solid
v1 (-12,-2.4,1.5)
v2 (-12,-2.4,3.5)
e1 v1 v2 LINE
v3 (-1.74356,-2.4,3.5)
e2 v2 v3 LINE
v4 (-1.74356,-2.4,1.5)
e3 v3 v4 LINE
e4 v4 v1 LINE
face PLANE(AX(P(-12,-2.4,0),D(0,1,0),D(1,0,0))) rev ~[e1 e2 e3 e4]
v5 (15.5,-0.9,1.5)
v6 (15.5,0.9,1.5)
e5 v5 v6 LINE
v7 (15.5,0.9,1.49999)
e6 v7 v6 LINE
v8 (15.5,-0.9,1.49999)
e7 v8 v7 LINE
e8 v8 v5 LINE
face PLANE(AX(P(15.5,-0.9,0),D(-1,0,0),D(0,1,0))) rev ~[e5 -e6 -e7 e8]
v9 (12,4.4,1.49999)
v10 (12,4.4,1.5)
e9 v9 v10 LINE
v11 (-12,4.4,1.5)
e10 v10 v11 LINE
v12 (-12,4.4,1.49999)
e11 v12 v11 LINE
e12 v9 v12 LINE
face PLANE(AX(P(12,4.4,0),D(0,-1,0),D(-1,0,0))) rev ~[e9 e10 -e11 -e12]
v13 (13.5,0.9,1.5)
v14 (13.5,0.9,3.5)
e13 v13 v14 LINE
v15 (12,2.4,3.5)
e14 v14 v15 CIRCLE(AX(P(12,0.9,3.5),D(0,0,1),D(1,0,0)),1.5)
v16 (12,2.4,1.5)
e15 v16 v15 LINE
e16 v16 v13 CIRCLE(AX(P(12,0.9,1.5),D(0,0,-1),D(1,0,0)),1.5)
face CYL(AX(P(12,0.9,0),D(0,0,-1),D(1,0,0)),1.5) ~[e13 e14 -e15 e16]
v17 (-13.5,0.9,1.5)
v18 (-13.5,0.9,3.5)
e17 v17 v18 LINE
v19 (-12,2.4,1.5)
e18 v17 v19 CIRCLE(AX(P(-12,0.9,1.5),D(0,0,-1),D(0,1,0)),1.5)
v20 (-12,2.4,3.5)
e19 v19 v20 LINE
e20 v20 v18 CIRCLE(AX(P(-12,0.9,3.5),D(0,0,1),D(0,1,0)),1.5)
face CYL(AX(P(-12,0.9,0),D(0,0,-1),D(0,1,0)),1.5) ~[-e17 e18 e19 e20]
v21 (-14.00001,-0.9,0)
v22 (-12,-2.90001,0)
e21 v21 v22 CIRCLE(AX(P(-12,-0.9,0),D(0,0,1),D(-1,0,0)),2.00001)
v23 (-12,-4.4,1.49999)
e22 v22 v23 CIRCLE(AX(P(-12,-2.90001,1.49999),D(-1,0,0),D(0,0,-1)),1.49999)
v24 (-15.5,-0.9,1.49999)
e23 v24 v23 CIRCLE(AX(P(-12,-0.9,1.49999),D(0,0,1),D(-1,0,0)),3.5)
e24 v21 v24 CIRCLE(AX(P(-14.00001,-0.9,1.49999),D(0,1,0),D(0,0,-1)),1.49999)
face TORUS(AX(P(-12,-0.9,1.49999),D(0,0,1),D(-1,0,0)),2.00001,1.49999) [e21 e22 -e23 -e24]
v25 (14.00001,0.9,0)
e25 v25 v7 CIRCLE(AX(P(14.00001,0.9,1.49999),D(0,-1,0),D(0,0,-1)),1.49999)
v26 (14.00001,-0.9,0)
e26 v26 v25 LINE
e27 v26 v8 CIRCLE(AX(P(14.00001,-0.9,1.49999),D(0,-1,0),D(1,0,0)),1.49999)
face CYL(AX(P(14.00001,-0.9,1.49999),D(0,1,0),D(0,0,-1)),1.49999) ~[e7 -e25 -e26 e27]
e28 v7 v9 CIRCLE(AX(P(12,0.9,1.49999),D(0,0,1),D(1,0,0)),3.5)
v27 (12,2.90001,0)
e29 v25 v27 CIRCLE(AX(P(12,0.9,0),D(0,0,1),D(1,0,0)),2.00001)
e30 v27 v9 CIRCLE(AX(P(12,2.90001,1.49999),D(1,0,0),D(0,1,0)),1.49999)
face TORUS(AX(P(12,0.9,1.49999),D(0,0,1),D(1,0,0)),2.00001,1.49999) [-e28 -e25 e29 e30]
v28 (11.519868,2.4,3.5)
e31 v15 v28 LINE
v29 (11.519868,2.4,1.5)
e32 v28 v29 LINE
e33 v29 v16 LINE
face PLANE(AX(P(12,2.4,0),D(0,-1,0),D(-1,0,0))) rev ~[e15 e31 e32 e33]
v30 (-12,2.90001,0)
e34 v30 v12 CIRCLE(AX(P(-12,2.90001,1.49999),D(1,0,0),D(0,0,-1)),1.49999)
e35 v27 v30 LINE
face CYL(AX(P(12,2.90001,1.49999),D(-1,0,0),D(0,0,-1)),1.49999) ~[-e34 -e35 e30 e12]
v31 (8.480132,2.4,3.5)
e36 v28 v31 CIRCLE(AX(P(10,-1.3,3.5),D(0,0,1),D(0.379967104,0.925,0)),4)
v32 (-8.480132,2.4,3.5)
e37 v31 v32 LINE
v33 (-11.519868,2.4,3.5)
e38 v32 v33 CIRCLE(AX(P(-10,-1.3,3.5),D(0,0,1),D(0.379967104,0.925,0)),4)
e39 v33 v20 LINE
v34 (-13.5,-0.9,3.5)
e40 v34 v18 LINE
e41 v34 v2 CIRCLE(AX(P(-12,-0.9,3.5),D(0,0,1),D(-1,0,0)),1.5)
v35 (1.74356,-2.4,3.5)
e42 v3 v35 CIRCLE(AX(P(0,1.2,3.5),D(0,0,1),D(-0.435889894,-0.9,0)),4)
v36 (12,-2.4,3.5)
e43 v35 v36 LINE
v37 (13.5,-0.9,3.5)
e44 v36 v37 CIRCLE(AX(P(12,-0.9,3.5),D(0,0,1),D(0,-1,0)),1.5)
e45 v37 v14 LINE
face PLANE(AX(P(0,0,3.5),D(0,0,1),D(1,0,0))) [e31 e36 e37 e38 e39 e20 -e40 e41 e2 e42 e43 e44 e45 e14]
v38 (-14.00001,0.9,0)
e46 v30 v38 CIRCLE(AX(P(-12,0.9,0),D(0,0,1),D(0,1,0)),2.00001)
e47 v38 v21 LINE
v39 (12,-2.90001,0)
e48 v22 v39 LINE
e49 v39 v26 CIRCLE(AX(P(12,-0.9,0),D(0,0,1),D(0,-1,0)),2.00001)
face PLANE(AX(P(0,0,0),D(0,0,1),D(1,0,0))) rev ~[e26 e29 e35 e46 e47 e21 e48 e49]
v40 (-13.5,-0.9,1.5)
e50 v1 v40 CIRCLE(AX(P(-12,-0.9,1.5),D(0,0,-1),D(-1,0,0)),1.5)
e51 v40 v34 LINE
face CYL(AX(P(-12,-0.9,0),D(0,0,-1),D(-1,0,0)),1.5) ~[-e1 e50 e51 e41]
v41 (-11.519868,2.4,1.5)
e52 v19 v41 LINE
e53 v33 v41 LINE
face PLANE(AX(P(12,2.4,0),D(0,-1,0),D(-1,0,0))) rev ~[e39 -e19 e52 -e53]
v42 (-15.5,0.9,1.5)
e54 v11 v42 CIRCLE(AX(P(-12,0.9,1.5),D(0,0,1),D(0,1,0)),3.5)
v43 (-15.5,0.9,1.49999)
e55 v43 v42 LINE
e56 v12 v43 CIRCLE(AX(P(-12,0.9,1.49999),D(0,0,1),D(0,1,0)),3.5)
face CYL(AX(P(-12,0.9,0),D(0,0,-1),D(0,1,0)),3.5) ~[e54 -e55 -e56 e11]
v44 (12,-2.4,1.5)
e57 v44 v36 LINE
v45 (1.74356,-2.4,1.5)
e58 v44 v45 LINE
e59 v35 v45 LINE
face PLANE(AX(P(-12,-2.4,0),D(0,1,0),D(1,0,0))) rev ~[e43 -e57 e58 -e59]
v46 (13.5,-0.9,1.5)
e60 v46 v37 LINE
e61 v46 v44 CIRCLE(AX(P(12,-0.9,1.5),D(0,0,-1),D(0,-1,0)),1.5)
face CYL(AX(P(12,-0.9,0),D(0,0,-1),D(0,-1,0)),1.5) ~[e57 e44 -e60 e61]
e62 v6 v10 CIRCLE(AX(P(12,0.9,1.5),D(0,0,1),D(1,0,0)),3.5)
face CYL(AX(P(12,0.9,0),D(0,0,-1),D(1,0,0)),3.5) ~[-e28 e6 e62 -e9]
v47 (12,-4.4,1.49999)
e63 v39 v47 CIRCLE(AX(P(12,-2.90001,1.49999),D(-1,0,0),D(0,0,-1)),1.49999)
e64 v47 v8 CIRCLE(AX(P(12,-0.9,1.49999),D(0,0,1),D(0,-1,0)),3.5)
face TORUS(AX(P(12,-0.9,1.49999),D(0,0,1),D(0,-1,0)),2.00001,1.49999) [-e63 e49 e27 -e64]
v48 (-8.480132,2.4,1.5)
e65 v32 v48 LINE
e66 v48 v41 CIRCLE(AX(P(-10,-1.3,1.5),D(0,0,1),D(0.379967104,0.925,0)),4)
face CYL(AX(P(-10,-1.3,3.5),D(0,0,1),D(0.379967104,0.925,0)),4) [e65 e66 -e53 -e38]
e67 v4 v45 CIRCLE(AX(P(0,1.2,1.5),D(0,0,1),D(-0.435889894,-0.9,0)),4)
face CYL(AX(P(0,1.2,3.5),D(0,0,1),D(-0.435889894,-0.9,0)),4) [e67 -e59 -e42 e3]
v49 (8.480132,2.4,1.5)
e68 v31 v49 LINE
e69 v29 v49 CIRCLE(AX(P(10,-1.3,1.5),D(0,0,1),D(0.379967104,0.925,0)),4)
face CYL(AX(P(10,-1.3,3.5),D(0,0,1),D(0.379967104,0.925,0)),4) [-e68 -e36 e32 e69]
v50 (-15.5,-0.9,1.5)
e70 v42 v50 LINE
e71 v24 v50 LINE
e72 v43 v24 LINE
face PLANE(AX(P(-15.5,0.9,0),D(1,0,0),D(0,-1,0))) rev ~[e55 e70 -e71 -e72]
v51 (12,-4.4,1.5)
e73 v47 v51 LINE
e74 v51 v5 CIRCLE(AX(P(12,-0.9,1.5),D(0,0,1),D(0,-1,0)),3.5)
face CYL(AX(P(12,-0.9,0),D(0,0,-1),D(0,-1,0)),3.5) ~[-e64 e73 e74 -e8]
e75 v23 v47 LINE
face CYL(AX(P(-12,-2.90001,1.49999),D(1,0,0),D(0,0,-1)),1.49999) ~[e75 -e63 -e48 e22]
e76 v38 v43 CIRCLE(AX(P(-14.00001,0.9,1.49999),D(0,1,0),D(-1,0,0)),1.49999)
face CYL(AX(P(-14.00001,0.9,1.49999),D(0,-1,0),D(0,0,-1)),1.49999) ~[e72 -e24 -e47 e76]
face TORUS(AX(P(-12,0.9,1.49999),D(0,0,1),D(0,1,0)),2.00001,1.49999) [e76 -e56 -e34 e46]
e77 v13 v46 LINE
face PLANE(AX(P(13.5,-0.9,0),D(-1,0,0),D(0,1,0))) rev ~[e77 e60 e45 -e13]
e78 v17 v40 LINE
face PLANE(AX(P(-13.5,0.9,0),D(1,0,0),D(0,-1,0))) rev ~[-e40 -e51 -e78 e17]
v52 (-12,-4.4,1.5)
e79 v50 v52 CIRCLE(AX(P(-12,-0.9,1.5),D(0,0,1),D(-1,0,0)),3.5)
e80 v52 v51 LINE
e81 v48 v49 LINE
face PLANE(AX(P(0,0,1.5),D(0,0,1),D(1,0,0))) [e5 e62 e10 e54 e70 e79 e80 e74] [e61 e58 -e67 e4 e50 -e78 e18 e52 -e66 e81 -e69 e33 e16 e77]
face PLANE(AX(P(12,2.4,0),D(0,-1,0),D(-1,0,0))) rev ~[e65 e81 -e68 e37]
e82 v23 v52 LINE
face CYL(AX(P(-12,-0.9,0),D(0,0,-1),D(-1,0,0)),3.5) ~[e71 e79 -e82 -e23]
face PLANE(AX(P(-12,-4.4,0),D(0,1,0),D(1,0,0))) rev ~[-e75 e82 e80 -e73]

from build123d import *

# Parameters (mm, degrees)
F1_DEPTH = 1.5
F2_DEPTH = 3.5
F3_R     = 1.49999
F5_DEPTH = 2


# Not quite as in the source:
# - a fillet or chamfer is up to 0.001 mm smaller than in the source, because OpenCascade refuses the exact size


with BuildPart() as f1:
    # F0 (on Top) → F1 (new body)
    with BuildSketch(Plane.XY):
        with BuildLine():
            Line((15.5, -0.9), (15.5, 0.9))
            ThreePointArc((15.5, 0.9), (14.4748737342, 3.3748737342), (12, 4.4))
            Line((12, 4.4), (-12, 4.4))
            ThreePointArc((-12, 4.4), (-14.4748737342, 3.3748737342), (-15.5, 0.9))
            Line((-15.5, 0.9), (-15.5, -0.9))
            ThreePointArc((-15.5, -0.9), (-14.4748737342, -3.3748737342), (-12, -4.4))
            Line((-12, -4.4), (12, -4.4))
            ThreePointArc((12, -4.4), (14.4748737342, -3.3748737342), (15.5, -0.9))
        make_face()
        with BuildLine():
            ThreePointArc((13.5, -0.9), (13.0606601718, -1.9606601718), (12, -2.4))
            Line((12, -2.4), (-12, -2.4))
            ThreePointArc((-12, -2.4), (-13.0606601718, -1.9606601718), (-13.5, -0.9))
            Line((-13.5, -0.9), (-13.5, 0.9))
            ThreePointArc((-13.5, 0.9), (-13.0606601718, 1.9606601718), (-12, 2.4))
            Line((-12, 2.4), (12, 2.4))
            ThreePointArc((12, 2.4), (13.0606601718, 1.9606601718), (13.5, 0.9))
            Line((13.5, 0.9), (13.5, -0.9))
        make_face(mode=Mode.SUBTRACT)
        with BuildLine():
            Line((-12, -2.4), (12, -2.4))
            ThreePointArc((12, -2.4), (13.0606601718, -1.9606601718), (13.5, -0.9))
            Line((13.5, -0.9), (13.5, 0.9))
            ThreePointArc((13.5, 0.9), (13.0606601718, 1.9606601718), (12, 2.4))
            Line((12, 2.4), (-12, 2.4))
            ThreePointArc((-12, 2.4), (-13.0606601718, 1.9606601718), (-13.5, 0.9))
            Line((-13.5, 0.9), (-13.5, -0.9))
            ThreePointArc((-13.5, -0.9), (-13.0606601718, -1.9606601718), (-12, -2.4))
        make_face()
        with BuildLine():
            ThreePointArc((12, 1.6), (12.4949747468, 1.3949747468), (12.7, 0.9))
            Line((12.7, 0.9), (12.7, -0.9))
            ThreePointArc((12.7, -0.9), (12.4949747468, -1.3949747468), (12, -1.6))
            Line((12, -1.6), (-12, -1.6))
            ThreePointArc((-12, -1.6), (-12.4949747468, -1.3949747468), (-12.7, -0.9))
            Line((-12.7, -0.9), (-12.7, 0.9))
            ThreePointArc((-12.7, 0.9), (-12.4949747468, 1.3949747468), (-12, 1.6))
            Line((-12, 1.6), (12, 1.6))
        make_face(mode=Mode.SUBTRACT)
        with BuildLine():
            Line((12.7, -0.9), (12.7, 0.9))
            ThreePointArc((12.7, 0.9), (12.4949747468, 1.3949747468), (12, 1.6))
            Line((12, 1.6), (-12, 1.6))
            ThreePointArc((-12, 1.6), (-12.4949747468, 1.3949747468), (-12.7, 0.9))
            Line((-12.7, 0.9), (-12.7, -0.9))
            ThreePointArc((-12.7, -0.9), (-12.4949747468, -1.3949747468), (-12, -1.6))
            Line((-12, -1.6), (12, -1.6))
            ThreePointArc((12, -1.6), (12.4949747468, -1.3949747468), (12.7, -0.9))
        make_face()
    extrude(amount=F1_DEPTH)

    # F0 (on Top) → F2 (join)
    with BuildSketch(Plane.XY):
        with BuildLine():
            Line((-12, -2.4), (12, -2.4))
            ThreePointArc((12, -2.4), (13.0606601718, -1.9606601718), (13.5, -0.9))
            Line((13.5, -0.9), (13.5, 0.9))
            ThreePointArc((13.5, 0.9), (13.0606601718, 1.9606601718), (12, 2.4))
            Line((12, 2.4), (-12, 2.4))
            ThreePointArc((-12, 2.4), (-13.0606601718, 1.9606601718), (-13.5, 0.9))
            Line((-13.5, 0.9), (-13.5, -0.9))
            ThreePointArc((-13.5, -0.9), (-13.0606601718, -1.9606601718), (-12, -2.4))
        make_face()
        with BuildLine():
            ThreePointArc((12, 1.6), (12.4949747468, 1.3949747468), (12.7, 0.9))
            Line((12.7, 0.9), (12.7, -0.9))
            ThreePointArc((12.7, -0.9), (12.4949747468, -1.3949747468), (12, -1.6))
            Line((12, -1.6), (-12, -1.6))
            ThreePointArc((-12, -1.6), (-12.4949747468, -1.3949747468), (-12.7, -0.9))
            Line((-12.7, -0.9), (-12.7, 0.9))
            ThreePointArc((-12.7, 0.9), (-12.4949747468, 1.3949747468), (-12, 1.6))
            Line((-12, 1.6), (12, 1.6))
        make_face(mode=Mode.SUBTRACT)
        with BuildLine():
            Line((12.7, -0.9), (12.7, 0.9))
            ThreePointArc((12.7, 0.9), (12.4949747468, 1.3949747468), (12, 1.6))
            Line((12, 1.6), (-12, 1.6))
            ThreePointArc((-12, 1.6), (-12.4949747468, 1.3949747468), (-12.7, 0.9))
            Line((-12.7, 0.9), (-12.7, -0.9))
            ThreePointArc((-12.7, -0.9), (-12.4949747468, -1.3949747468), (-12, -1.6))
            Line((-12, -1.6), (12, -1.6))
            ThreePointArc((12, -1.6), (12.4949747468, -1.3949747468), (12.7, -0.9))
        make_face()
    extrude(amount=F2_DEPTH)

    # F3 (radius 1.5 in the source; OpenCascade refuses exactly that, so slightly less here)
    f3_edges = [f1.edges().sort_by_distance(p)[0] for p in [
        (0, -4.4, 0),
        (-14.474874, -3.374874, 0),
        (-15.5, 0, 0),
        (14.474874, -3.374874, 0),
        (15.5, 0, 0),
        (14.474874, 3.374874, 0),
        (0, 4.4, 0),
        (-14.474874, 3.374874, 0),
    ]]
    fillet(f3_edges, radius=F3_R)

    # F4 (on face) → F5 (join, through all)
    with BuildSketch(Plane.XY.offset(3.5)):
        with BuildLine():
            ThreePointArc((-6.1542230954, -2.4), (-6.0387434053, -1.8553793215), (-6, -1.3))
            ThreePointArc((-6, -1.3), (-6.6773900574, 0.9271648276), (-8.4801315846, 2.4))
            Line((-8.4801315846, 2.4), (-11.5198684154, 2.4))
            ThreePointArc((-11.5198684154, 2.4), (-12.6603120365, 1.6870955573), (-13.5, 0.6364916731))
            Line((-13.5, 0.6364916731), (-13.5, -0.9))
            ThreePointArc((-13.5, -0.9), (-13.0606601718, -1.9606601718), (-12, -2.4))
            Line((-12, -2.4), (-6.1542230954, -2.4))
        make_face()
        with BuildLine():
            Line((-11.5198684154, 2.4), (-8.4801315846, 2.4))
            ThreePointArc((-8.4801315846, 2.4), (-10, 2.7), (-11.5198684154, 2.4))
        make_face()
        with BuildLine():
            Line((3.8157568057, 2.4), (-3.8157568057, 2.4))
            ThreePointArc((-3.8157568057, 2.4), (-3.6723969913, -0.3854022638), (-1.7435595774, -2.4))
            Line((-1.7435595774, -2.4), (1.7435595774, -2.4))
            ThreePointArc((1.7435595774, -2.4), (3.3892652825, -0.9243542184), (4, 1.2))
            ThreePointArc((4, 1.2), (3.9536709033, 1.8070307971), (3.8157568057, 2.4))
        make_face()
        with BuildLine():
            Line((1.7435595774, -2.4), (-1.7435595774, -2.4))
            ThreePointArc((-1.7435595774, -2.4), (0, -2.8), (1.7435595774, -2.4))
        make_face()
        with BuildLine():
            ThreePointArc((11.5198684154, 2.4), (10, 2.7), (8.4801315846, 2.4))
            Line((8.4801315846, 2.4), (11.5198684154, 2.4))
        make_face()
    extrude(amount=-F5_DEPTH)


solid = f1.part
